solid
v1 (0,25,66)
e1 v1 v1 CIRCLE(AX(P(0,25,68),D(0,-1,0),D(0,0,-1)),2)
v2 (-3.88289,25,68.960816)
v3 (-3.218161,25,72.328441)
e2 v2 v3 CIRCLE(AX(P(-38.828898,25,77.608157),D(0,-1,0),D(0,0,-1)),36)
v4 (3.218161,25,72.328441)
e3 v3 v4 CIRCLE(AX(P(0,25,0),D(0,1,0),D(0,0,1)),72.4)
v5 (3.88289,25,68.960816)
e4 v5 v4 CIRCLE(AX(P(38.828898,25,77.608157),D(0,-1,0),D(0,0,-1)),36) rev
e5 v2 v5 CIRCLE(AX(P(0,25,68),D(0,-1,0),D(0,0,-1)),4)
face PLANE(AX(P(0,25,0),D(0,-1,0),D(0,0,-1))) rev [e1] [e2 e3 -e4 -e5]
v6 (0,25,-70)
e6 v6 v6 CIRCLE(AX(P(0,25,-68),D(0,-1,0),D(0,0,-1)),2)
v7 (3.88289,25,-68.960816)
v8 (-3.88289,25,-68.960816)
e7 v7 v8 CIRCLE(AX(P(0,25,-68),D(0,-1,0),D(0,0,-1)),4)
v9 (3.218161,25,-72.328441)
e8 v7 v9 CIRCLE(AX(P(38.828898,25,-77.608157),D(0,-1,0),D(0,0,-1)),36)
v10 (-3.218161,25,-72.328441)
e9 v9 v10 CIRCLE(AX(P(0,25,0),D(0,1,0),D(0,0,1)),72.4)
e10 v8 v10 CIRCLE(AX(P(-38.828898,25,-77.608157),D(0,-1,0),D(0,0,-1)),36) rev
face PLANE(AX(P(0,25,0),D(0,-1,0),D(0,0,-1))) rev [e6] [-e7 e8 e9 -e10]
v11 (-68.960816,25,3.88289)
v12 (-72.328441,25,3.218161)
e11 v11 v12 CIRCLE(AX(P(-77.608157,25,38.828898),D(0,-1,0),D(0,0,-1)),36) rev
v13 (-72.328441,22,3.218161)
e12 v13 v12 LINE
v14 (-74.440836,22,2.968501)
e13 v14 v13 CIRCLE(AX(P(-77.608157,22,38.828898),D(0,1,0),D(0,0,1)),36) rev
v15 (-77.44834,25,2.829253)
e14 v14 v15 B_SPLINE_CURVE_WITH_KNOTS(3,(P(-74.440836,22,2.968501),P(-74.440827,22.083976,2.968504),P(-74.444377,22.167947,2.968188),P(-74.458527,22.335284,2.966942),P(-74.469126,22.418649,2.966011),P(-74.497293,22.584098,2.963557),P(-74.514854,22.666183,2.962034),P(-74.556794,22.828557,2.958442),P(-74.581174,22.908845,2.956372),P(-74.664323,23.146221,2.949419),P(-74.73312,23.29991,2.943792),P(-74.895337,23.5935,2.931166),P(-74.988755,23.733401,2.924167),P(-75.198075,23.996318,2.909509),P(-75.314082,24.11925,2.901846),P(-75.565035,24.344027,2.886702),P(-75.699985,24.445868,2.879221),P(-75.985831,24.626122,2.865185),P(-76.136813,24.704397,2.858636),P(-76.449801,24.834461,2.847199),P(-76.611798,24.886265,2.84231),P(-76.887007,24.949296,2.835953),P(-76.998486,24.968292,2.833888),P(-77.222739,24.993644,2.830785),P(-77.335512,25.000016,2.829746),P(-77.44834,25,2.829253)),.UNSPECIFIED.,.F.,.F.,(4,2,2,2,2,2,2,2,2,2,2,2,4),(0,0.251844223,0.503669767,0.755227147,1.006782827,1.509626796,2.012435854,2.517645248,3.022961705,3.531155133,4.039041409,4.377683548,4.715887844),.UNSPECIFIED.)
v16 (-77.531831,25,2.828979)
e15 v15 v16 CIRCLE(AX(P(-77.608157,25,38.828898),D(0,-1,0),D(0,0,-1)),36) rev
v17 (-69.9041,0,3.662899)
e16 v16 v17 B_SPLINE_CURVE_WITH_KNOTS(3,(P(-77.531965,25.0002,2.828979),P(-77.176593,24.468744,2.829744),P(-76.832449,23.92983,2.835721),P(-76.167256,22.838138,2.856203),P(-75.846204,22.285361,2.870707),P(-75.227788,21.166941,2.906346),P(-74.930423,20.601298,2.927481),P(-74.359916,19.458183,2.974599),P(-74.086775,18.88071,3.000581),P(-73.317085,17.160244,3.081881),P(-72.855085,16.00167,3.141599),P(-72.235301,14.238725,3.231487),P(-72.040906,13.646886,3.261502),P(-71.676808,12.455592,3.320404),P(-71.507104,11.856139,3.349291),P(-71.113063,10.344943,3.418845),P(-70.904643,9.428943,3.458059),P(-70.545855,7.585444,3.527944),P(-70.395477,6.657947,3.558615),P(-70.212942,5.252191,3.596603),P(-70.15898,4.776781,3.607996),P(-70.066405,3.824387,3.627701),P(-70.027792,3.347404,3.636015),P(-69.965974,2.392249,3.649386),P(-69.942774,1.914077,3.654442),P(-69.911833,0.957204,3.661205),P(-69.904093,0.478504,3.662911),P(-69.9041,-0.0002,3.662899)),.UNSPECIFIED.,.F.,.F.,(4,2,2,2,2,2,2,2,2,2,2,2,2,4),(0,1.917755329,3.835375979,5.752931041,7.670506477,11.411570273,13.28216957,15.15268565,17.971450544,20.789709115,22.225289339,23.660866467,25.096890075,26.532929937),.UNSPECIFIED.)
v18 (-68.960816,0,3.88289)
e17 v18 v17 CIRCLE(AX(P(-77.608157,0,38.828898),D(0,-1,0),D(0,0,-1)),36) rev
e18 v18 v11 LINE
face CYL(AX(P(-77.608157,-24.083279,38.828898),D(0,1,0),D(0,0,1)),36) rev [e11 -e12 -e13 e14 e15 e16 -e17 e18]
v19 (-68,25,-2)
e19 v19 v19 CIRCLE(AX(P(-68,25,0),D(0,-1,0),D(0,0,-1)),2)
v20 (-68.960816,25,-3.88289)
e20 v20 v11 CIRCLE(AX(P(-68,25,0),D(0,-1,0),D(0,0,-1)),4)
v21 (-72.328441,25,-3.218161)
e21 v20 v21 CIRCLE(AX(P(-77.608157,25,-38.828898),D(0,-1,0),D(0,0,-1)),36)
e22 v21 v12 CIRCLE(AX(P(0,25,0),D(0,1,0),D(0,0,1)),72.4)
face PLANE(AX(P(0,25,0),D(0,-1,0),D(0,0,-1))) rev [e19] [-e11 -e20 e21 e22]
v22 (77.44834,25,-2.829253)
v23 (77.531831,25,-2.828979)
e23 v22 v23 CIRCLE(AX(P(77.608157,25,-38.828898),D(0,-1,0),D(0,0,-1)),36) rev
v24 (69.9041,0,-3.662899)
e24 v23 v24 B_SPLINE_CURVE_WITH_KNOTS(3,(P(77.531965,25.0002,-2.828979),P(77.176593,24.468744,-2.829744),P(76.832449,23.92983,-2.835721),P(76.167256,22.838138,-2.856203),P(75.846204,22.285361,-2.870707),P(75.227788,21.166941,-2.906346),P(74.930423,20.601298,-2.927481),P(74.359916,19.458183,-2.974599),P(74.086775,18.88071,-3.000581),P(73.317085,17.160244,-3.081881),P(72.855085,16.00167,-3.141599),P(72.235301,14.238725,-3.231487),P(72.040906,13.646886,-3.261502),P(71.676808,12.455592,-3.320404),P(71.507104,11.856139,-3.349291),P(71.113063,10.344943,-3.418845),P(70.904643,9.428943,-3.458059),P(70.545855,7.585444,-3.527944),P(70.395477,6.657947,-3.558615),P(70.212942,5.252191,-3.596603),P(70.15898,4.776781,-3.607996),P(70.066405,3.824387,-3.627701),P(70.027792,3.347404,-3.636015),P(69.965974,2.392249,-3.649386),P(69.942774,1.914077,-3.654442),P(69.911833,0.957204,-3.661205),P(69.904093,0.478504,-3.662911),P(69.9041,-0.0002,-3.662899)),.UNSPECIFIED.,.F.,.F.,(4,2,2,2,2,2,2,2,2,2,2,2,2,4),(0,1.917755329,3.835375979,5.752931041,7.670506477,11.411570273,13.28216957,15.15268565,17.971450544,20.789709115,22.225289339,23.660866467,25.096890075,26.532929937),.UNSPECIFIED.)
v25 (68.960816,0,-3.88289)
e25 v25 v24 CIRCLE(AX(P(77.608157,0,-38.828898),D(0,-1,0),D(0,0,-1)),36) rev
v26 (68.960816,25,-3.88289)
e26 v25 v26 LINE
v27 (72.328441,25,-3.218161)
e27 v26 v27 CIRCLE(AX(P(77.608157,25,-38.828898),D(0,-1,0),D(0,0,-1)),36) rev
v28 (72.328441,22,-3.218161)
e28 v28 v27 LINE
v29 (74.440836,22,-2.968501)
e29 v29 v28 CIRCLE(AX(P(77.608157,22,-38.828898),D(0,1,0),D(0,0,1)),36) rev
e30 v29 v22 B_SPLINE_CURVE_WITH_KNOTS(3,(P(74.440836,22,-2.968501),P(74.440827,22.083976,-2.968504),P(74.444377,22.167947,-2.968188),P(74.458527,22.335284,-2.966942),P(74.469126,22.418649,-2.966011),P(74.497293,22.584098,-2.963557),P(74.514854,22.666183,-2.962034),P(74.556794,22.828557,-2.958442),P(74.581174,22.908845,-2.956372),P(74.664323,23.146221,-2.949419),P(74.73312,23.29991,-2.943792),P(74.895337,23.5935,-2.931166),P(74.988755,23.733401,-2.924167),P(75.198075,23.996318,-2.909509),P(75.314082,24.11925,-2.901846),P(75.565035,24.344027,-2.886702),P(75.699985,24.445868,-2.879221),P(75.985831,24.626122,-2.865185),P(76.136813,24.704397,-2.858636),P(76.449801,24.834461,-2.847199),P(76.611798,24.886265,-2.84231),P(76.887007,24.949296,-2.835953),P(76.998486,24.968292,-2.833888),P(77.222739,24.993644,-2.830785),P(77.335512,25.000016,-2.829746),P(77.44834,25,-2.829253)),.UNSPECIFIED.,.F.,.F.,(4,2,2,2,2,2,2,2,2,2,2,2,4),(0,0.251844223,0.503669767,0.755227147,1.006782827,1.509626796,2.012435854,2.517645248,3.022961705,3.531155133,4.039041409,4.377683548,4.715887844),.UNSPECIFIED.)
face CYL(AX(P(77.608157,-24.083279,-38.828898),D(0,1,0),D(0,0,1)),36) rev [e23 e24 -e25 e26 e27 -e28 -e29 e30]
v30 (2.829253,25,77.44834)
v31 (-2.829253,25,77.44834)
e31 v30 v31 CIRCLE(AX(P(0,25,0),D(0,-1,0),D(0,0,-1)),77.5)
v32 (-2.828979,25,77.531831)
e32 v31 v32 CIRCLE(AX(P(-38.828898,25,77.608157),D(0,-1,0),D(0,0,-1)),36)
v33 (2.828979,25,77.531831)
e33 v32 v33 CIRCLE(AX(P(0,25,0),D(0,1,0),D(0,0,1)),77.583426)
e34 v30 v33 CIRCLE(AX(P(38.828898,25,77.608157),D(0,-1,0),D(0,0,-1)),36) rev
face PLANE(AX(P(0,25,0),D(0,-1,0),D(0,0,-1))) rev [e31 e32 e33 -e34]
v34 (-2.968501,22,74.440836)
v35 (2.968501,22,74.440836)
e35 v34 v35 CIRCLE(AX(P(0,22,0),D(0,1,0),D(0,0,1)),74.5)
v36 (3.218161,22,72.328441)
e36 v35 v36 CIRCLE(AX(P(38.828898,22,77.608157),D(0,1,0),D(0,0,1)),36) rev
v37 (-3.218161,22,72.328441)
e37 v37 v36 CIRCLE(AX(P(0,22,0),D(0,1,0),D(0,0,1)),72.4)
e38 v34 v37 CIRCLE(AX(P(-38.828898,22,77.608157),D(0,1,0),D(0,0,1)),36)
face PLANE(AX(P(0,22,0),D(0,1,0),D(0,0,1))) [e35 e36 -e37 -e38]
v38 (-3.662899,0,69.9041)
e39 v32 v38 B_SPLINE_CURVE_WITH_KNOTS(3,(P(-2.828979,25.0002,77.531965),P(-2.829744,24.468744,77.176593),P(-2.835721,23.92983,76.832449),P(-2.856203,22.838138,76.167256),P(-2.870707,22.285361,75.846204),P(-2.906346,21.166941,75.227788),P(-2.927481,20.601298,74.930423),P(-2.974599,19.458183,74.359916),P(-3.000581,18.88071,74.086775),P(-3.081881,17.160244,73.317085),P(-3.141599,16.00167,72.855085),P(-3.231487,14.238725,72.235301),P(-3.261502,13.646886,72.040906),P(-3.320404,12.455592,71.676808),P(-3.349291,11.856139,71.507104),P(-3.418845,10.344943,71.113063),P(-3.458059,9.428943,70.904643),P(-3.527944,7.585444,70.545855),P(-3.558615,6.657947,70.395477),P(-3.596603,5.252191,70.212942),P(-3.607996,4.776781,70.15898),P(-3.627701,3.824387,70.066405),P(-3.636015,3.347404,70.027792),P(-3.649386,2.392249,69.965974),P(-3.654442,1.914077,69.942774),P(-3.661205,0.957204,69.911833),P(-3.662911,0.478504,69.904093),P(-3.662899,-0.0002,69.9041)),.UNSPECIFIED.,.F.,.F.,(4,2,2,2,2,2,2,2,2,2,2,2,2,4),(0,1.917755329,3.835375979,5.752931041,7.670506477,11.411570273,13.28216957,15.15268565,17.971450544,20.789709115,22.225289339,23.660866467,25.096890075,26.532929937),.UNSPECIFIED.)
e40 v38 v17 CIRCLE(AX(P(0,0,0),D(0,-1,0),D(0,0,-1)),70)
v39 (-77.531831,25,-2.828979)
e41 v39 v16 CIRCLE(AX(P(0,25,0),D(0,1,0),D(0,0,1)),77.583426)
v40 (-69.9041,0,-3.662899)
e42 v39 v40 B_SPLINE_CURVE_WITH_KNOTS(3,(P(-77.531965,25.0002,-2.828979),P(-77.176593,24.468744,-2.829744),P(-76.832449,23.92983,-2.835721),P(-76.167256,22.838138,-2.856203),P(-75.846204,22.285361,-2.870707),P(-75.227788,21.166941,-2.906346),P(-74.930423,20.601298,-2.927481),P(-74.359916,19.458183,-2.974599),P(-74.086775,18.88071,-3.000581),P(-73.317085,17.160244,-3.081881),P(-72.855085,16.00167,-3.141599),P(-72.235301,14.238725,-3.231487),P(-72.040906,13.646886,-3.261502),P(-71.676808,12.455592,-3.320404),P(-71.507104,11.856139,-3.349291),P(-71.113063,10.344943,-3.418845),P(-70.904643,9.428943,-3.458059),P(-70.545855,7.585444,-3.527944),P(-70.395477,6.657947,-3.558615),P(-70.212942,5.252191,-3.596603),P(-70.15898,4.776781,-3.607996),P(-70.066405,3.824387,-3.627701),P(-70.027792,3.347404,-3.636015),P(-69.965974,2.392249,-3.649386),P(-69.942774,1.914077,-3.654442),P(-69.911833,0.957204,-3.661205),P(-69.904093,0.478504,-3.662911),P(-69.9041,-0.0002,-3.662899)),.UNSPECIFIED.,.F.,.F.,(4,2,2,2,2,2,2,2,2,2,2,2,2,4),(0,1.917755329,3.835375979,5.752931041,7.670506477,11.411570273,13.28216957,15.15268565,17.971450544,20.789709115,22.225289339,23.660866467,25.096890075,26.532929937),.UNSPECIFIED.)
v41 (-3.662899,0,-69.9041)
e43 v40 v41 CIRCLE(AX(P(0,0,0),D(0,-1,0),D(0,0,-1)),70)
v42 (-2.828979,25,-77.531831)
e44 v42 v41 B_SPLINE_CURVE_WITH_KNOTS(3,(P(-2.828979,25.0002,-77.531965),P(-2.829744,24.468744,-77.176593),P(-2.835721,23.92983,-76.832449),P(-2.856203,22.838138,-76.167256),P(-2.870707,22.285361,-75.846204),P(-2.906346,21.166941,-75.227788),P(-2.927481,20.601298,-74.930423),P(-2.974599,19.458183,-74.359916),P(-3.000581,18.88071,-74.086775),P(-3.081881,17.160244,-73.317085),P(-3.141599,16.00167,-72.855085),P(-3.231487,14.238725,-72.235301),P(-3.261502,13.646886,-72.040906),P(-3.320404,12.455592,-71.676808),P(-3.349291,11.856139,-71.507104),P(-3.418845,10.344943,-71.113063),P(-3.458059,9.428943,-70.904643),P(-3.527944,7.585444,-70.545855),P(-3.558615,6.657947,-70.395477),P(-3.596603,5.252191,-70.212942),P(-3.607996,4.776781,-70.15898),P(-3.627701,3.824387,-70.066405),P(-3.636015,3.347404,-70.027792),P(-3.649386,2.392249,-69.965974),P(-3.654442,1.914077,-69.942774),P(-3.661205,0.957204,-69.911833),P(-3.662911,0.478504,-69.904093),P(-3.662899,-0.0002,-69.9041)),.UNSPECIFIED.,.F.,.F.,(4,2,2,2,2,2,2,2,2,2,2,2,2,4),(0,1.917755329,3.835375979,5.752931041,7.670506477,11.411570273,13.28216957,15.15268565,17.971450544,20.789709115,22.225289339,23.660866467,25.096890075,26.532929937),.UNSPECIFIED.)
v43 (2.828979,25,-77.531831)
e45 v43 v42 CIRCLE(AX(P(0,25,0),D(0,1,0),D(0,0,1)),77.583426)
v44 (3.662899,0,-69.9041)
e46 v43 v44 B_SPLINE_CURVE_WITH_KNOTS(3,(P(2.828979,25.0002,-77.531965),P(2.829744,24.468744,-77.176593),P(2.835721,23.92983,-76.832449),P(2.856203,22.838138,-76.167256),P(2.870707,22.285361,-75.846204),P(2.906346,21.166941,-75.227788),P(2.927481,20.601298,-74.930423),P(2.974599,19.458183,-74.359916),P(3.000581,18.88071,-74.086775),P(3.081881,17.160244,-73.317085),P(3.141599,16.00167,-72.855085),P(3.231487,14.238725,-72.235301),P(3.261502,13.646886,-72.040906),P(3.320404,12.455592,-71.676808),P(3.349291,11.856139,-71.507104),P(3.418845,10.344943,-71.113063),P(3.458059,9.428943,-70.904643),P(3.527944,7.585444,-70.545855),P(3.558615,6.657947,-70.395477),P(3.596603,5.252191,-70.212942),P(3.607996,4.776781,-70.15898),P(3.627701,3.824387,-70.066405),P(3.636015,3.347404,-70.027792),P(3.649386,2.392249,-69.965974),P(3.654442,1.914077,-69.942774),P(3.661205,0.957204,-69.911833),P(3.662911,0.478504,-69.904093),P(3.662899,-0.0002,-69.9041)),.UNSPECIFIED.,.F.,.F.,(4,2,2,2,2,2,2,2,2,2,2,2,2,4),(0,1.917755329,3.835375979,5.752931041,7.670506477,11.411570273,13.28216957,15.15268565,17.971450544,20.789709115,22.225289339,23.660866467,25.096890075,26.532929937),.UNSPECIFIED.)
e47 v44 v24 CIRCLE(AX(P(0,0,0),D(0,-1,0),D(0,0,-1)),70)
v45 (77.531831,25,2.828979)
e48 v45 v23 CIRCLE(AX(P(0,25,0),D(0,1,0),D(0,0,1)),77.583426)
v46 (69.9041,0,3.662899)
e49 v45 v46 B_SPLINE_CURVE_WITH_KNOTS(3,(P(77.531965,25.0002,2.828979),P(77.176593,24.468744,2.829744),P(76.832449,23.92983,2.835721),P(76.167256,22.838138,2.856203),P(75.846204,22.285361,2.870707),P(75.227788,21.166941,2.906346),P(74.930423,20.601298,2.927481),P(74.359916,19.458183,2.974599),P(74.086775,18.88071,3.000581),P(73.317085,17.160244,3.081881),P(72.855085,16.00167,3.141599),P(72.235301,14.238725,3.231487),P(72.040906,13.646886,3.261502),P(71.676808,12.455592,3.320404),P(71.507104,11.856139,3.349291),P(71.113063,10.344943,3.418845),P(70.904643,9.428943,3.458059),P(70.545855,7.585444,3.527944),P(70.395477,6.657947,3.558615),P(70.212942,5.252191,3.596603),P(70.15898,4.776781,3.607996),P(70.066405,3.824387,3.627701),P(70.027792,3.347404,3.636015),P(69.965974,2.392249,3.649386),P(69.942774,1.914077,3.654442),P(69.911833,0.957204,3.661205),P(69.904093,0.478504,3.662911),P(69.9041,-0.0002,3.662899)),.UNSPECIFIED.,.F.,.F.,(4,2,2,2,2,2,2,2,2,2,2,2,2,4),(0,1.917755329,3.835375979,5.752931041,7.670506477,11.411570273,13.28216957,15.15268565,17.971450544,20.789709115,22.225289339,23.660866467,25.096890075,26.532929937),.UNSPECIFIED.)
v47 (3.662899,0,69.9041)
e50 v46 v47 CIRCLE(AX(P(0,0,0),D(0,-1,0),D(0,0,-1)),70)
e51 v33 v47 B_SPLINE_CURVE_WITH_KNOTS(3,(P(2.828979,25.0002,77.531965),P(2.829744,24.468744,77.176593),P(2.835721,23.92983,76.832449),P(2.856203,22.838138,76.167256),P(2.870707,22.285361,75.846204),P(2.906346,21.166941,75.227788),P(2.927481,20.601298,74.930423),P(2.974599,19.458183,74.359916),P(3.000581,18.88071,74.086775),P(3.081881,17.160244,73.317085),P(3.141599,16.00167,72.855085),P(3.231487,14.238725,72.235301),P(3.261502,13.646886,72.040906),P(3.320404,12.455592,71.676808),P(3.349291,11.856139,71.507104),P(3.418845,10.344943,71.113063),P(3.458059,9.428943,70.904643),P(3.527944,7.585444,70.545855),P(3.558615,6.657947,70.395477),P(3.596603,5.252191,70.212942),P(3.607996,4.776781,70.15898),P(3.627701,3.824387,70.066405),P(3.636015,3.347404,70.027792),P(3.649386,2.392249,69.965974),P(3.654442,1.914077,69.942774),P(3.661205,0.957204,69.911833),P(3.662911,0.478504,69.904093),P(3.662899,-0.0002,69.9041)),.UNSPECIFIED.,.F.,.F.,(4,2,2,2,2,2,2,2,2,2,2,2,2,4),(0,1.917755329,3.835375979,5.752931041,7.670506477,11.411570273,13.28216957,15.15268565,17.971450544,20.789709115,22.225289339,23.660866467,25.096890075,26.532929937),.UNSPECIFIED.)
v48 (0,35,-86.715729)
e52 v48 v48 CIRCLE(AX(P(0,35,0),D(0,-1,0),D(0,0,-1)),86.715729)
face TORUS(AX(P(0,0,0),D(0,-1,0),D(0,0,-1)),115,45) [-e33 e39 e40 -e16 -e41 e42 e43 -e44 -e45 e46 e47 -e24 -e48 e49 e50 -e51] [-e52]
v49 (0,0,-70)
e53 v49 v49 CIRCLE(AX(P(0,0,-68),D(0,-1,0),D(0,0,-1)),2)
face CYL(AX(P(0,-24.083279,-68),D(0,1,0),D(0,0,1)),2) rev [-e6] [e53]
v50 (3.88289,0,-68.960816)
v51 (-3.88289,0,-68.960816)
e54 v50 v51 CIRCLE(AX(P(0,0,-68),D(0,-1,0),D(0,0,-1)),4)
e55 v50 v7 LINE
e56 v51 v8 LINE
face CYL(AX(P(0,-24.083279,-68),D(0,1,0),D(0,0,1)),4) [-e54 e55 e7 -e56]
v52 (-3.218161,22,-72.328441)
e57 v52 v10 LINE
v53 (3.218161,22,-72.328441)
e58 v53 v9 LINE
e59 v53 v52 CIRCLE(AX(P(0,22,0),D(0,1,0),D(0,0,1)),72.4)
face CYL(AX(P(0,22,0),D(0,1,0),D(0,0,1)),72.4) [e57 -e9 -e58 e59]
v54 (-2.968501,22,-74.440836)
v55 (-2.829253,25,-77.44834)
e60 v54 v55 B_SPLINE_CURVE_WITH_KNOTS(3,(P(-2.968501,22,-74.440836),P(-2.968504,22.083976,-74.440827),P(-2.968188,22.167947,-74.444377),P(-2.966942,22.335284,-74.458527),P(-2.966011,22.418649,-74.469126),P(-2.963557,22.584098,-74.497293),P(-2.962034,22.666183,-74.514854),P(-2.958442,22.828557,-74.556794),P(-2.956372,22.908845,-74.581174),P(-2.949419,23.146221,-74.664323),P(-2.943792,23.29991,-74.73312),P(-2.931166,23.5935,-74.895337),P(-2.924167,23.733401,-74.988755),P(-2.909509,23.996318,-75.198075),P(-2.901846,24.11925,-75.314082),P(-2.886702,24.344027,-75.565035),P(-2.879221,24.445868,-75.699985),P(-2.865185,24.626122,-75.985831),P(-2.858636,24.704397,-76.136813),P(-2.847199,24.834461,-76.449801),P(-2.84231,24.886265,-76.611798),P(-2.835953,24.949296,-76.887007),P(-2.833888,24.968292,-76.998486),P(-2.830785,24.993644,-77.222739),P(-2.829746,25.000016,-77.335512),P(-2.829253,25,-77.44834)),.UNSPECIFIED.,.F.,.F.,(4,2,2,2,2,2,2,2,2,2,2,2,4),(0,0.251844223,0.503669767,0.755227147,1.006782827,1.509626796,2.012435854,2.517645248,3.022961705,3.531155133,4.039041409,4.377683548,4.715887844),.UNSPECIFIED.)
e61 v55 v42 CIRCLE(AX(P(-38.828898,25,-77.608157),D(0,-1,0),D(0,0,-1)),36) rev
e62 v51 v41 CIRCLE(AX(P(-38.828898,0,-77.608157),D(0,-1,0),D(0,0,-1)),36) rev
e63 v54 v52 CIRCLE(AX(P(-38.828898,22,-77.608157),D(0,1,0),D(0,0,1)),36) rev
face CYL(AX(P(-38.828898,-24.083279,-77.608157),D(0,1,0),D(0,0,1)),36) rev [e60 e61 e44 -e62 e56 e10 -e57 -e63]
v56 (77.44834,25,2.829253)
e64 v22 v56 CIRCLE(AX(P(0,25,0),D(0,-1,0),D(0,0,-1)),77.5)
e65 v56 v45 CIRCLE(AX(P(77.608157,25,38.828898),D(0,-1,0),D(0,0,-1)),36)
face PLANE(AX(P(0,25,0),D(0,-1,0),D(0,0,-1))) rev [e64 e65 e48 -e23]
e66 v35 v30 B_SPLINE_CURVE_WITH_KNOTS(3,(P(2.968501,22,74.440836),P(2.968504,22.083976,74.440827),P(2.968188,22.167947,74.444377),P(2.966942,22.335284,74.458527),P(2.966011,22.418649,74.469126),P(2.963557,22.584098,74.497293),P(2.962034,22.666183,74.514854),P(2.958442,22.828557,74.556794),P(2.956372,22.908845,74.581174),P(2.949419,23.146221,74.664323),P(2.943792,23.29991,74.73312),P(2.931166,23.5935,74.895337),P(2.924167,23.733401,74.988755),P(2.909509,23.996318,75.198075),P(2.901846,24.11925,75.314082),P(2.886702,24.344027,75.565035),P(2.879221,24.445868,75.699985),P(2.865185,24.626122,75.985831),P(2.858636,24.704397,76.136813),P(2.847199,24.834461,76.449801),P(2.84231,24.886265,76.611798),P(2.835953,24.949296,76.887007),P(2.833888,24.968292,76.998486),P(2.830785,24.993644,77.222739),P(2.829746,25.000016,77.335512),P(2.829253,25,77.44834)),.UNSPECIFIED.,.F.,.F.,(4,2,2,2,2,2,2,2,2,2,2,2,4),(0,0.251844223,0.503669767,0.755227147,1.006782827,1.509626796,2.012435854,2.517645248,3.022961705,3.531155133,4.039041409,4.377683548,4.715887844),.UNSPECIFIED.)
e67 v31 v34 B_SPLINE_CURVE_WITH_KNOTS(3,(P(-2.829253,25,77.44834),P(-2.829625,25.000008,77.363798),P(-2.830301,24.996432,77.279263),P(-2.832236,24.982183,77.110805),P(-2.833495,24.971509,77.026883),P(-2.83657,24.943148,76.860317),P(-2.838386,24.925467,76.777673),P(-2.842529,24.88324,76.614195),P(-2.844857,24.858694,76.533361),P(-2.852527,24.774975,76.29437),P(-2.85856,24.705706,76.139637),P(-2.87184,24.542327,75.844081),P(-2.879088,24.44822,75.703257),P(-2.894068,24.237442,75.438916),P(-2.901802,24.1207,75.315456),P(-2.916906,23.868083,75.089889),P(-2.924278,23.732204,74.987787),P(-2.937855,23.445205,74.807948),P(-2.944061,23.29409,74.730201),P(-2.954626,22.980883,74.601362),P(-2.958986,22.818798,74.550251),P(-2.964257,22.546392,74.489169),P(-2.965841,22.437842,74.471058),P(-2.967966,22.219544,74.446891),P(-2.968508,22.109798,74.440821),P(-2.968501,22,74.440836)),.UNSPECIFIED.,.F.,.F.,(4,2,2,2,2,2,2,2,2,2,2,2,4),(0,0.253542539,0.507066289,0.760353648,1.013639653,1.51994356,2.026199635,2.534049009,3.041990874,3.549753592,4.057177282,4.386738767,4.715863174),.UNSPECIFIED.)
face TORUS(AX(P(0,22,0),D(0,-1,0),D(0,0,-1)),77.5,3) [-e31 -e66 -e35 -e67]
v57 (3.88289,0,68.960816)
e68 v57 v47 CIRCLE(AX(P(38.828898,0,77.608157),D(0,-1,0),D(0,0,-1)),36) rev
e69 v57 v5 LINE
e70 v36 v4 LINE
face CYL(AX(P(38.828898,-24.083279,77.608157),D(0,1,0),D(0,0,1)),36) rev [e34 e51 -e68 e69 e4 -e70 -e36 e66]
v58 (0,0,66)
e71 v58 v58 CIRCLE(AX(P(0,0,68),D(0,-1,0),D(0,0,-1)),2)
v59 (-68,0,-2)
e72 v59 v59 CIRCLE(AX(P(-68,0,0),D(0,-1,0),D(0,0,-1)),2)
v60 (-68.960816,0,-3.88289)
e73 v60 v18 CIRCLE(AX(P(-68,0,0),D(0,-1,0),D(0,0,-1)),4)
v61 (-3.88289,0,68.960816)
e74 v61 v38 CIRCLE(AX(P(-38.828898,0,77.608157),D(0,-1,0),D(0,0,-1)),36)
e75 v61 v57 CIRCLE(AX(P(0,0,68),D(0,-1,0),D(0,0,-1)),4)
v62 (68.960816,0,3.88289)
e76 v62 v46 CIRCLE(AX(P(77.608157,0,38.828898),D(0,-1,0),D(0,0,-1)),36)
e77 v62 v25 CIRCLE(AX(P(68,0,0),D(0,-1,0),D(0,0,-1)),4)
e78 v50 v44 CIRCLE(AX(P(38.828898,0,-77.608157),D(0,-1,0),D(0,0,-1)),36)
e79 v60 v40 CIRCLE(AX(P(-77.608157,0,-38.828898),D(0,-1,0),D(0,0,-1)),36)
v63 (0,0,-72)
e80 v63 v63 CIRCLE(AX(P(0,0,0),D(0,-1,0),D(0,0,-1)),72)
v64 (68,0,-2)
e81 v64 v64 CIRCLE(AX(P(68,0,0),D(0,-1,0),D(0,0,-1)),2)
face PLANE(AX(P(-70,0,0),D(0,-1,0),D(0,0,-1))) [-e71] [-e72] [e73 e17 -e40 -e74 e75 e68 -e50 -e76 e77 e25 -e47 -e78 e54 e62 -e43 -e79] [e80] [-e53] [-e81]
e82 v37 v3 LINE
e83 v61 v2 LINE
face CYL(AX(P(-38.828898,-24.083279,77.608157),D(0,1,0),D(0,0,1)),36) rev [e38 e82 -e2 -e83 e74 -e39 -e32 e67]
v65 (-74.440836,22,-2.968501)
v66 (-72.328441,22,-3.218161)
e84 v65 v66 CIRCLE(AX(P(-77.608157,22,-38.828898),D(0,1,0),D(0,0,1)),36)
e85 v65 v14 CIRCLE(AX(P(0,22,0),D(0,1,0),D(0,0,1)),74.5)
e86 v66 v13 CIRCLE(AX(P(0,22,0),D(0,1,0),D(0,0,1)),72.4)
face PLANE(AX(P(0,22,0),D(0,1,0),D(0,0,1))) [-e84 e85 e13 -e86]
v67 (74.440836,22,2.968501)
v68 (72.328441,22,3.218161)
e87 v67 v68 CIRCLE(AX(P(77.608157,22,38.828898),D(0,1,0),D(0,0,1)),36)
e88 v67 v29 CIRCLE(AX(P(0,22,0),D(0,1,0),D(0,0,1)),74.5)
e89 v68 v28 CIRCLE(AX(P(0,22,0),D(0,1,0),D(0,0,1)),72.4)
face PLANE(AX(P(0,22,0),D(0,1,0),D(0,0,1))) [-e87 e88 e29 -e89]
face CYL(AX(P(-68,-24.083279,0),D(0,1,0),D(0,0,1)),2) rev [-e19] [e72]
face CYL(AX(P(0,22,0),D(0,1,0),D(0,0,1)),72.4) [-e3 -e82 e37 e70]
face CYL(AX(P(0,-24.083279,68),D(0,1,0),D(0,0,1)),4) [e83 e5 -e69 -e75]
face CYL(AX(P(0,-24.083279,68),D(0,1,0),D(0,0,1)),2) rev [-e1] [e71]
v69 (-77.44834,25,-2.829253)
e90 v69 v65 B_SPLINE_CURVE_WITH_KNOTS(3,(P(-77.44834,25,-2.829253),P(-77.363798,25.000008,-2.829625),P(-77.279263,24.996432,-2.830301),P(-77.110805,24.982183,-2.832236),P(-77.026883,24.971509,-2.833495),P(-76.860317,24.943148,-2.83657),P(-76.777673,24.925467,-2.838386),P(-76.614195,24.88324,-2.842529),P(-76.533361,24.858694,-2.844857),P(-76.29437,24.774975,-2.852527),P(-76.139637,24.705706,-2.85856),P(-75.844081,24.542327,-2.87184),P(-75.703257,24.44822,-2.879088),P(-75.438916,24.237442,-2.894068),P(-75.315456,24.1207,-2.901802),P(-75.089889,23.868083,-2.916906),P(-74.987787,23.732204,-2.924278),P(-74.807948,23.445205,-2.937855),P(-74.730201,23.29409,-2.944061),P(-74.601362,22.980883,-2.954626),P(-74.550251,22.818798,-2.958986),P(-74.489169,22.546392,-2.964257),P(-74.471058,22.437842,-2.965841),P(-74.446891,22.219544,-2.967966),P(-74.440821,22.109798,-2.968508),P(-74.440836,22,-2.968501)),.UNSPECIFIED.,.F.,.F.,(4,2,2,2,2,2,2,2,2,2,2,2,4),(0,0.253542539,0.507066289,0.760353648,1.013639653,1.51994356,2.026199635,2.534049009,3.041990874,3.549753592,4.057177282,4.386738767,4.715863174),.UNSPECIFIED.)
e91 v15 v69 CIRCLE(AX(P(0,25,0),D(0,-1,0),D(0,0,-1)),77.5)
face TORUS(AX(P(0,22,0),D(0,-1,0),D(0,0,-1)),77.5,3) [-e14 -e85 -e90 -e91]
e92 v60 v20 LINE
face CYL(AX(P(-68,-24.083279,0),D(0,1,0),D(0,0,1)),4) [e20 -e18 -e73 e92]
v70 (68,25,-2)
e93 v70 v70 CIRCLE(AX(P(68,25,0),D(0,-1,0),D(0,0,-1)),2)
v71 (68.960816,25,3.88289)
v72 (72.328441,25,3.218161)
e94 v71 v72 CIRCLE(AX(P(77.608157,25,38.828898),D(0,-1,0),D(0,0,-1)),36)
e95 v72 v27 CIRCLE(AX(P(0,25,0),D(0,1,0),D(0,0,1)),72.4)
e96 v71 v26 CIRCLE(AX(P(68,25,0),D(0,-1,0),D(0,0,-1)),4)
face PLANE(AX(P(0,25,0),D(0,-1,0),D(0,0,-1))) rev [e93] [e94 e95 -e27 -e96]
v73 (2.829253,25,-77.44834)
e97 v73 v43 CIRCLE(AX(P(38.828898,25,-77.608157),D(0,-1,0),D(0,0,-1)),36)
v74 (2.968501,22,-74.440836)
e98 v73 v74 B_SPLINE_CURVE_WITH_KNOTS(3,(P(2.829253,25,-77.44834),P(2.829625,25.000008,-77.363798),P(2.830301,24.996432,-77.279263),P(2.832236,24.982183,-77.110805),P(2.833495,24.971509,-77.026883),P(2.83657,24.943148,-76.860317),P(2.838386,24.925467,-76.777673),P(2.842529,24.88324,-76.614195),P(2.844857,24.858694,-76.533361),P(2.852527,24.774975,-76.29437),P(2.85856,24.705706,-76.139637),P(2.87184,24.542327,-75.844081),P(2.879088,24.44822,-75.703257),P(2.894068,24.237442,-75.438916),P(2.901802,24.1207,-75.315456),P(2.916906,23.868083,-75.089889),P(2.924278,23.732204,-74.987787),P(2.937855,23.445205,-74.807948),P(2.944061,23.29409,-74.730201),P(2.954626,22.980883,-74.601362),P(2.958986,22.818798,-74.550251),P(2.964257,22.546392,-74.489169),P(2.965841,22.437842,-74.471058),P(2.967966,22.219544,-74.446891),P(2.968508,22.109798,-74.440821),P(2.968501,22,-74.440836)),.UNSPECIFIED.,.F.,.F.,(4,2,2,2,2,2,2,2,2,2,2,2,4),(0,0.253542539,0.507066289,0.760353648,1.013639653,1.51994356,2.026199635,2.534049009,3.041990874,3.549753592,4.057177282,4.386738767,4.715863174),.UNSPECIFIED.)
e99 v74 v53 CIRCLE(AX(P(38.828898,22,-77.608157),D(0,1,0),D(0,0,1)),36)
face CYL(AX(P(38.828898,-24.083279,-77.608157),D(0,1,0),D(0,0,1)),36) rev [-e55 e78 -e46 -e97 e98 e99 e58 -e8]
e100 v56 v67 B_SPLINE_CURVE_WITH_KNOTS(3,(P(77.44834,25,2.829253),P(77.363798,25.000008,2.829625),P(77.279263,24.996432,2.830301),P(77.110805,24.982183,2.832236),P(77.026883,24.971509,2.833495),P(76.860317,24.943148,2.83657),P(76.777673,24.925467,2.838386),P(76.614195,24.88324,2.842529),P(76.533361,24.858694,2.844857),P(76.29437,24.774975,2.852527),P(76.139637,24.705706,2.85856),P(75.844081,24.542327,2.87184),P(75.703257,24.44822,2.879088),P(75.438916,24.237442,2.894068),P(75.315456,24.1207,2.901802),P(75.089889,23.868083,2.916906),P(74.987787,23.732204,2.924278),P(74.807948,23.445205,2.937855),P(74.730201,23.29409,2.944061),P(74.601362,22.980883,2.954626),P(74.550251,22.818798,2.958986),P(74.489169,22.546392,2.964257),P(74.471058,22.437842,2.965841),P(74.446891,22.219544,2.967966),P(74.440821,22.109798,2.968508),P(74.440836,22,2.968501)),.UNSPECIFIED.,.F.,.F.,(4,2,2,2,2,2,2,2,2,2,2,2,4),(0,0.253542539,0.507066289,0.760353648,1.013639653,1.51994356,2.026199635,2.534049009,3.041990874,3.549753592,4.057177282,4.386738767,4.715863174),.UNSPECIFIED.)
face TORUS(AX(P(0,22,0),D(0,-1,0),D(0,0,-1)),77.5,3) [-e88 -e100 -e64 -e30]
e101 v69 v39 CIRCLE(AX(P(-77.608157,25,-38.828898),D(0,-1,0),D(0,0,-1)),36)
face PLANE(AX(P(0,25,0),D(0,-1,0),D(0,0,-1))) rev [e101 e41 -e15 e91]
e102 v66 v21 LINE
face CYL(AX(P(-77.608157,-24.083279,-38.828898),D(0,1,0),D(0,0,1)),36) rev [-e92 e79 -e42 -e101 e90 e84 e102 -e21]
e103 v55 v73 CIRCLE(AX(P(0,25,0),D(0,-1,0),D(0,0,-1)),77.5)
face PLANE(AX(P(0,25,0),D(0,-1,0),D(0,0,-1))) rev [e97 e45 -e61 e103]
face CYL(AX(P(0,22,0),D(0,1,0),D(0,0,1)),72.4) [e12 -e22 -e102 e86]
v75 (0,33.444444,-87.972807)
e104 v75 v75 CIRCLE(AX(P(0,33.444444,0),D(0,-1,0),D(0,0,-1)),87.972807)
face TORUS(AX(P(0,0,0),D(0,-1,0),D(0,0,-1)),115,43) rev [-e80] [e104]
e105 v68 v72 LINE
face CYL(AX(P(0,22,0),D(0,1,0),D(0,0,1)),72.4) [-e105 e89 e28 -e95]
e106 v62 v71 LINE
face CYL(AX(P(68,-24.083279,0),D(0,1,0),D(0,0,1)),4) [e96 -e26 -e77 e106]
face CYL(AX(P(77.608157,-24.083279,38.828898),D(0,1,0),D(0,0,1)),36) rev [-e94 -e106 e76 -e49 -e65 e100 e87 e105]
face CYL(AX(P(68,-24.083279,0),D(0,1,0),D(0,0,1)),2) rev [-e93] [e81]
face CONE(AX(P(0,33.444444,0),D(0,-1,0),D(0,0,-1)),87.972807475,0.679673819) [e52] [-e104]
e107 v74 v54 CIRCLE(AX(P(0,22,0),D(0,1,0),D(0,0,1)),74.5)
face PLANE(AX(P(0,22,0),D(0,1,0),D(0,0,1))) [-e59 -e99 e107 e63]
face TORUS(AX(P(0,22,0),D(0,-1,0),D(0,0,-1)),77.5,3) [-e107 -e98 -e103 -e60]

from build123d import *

# Parameters (mm, degrees)
SKETCH2_R           = 2
BOSS_EXTRUDE1_DEPTH = 25
SKETCH4_R           = 74.5
SKETCH4_R_2         = 72.4
CUT_EXTRUDE1_DEPTH  = 3
FILLET1_R           = 3


with BuildPart() as part:
    # Sketch1 → Revolve-Thin1 (revolve)
    with BuildSketch(Plane.XY, mode=Mode.PRIVATE) as revolve_thin1_sk:
        with BuildLine():
            ThreePointArc((-70, 0), (-74.393398282, 19.393398282), (-86.715728753, 35))
            Line((-86.715728753, 35), (-87.972807475, 33.444444444))
            ThreePointArc((-87.972807475, 33.444444444), (-76.198136136, 18.53146947), (-72, 0))
            Line((-72, 0), (-70, 0))
        make_face()
    revolve(revolve_thin1_sk.sketch.rotate(Axis((0, 0, 0), (0, 1, 0)), 270), axis=Axis((0, 0, 0), (0, 1, 0)))

    # Sketch2 → Boss-Extrude1 (add)
    # profile 1 of 4: a face of its own
    with BuildSketch(Plane(origin=(0, 25, 0), x_dir=(-1, 0, 0), z_dir=(0, -1, 0))):
        with BuildLine():
            ThreePointArc((3.8828898, -68.960815695), (2.829681089, -77.845605343), (4, -86.715728753))
            Line((4, -86.715728753), (-4, -86.715728753))
            ThreePointArc((-4, -86.715728753), (-2.829681089, -77.845605343), (-3.8828898, -68.960815695))
            ThreePointArc((-3.8828898, -68.960815695), (0, -64), (3.8828898, -68.960815695))
        make_face()
        with Locations(Location((0, -68, 0), (0, 0, 90))):
            Circle(SKETCH2_R, mode=Mode.SUBTRACT)
    # profile 2 of 4: a face of its own
    with BuildSketch(Plane(origin=(0, 25, 0), x_dir=(-1, 0, 0), z_dir=(0, -1, 0))):
        with BuildLine():
            ThreePointArc((68.960815695, 3.8828898), (77.845605343, 2.829681089), (86.715728753, 4))
            Line((86.715728753, 4), (86.715728753, -4))
            ThreePointArc((86.715728753, -4), (77.845605343, -2.829681089), (68.960815695, -3.8828898))
            ThreePointArc((68.960815695, -3.8828898), (64, 0), (68.960815695, 3.8828898))
        make_face()
        with Locations(Location((68, 0, 0), (0, 0, 90))):
            Circle(SKETCH2_R, mode=Mode.SUBTRACT)
    # profile 3 of 4: a face of its own
    with BuildSketch(Plane(origin=(0, 25, 0), x_dir=(-1, 0, 0), z_dir=(0, -1, 0))):
        with BuildLine():
            ThreePointArc((-3.8828898, 68.960815695), (-2.829681089, 77.845605343), (-4, 86.715728753))
            Line((-4, 86.715728753), (4, 86.715728753))
            ThreePointArc((4, 86.715728753), (2.829681089, 77.845605343), (3.8828898, 68.960815695))
            ThreePointArc((3.8828898, 68.960815695), (0, 64), (-3.8828898, 68.960815695))
        make_face()
        with Locations(Location((0, 68, 0), (0, 0, 90))):
            Circle(SKETCH2_R, mode=Mode.SUBTRACT)
    # profile 4 of 4: a face of its own
    with BuildSketch(Plane(origin=(0, 25, 0), x_dir=(-1, 0, 0), z_dir=(0, -1, 0))):
        with BuildLine():
            ThreePointArc((-86.624516405, 3.976275972), (-86.692922667, 1.988661001), (-86.715728753, 0))
            ThreePointArc((-86.715728753, 0), (-86.692922667, -1.988661001), (-86.624516405, -3.976275972))
            ThreePointArc((-86.624516405, -3.976275972), (-77.798482599, -2.829401113), (-68.960815695, -3.8828898))
            ThreePointArc((-68.960815695, -3.8828898), (-64, 0), (-68.960815695, 3.8828898))
            ThreePointArc((-68.960815695, 3.8828898), (-77.798482599, 2.829401113), (-86.624516405, 3.976275972))
        make_face()
        with Locations(Location((-68, 0, 0), (0, 0, 90))):
            Circle(SKETCH2_R, mode=Mode.SUBTRACT)
    extrude(amount=BOSS_EXTRUDE1_DEPTH)

    # Sketch3 → Cut-Revolve1 (revolve, cut)
    with BuildSketch(Plane.XY, mode=Mode.PRIVATE) as cut_revolve1_sk:
        with BuildLine():
            Line((-72, 0), (-99.127196695, 0))
            Line((-99.127196695, 0), (-99.127196695, 33.444444444))
            Line((-99.127196695, 33.444444444), (-87.972807475, 33.444444444))
            ThreePointArc((-87.972807475, 33.444444444), (-76.198136136, 18.53146947), (-72, 0))
        make_face()
    revolve(cut_revolve1_sk.sketch.rotate(Axis((0, 0, 0), (0, 1, 0)), 270), axis=Axis((0, 0, 0), (0, 1, 0)), mode=Mode.SUBTRACT)

    # Sketch4 → Cut-Extrude1 (cut)
    with BuildSketch(Plane(origin=(0, 25, 0), x_dir=(1, 0, 0), z_dir=(0, 1, 0))):
        Circle(SKETCH4_R)
        Circle(SKETCH4_R_2, mode=Mode.SUBTRACT)
    extrude(amount=-CUT_EXTRUDE1_DEPTH, mode=Mode.SUBTRACT)

    # Fillet1
    fillet1_edges = [part.edges().sort_by_distance(p)[0] for p in [
        (-74.5, 25, 0),
        (0, 25, 74.5),
        (74.5, 25, 0),
        (0, 25, -74.5),
    ]]
    fillet(fillet1_edges, radius=FILLET1_R - 0.0001)  # a hair under: the kernel refuses the full size


solid = part.part
